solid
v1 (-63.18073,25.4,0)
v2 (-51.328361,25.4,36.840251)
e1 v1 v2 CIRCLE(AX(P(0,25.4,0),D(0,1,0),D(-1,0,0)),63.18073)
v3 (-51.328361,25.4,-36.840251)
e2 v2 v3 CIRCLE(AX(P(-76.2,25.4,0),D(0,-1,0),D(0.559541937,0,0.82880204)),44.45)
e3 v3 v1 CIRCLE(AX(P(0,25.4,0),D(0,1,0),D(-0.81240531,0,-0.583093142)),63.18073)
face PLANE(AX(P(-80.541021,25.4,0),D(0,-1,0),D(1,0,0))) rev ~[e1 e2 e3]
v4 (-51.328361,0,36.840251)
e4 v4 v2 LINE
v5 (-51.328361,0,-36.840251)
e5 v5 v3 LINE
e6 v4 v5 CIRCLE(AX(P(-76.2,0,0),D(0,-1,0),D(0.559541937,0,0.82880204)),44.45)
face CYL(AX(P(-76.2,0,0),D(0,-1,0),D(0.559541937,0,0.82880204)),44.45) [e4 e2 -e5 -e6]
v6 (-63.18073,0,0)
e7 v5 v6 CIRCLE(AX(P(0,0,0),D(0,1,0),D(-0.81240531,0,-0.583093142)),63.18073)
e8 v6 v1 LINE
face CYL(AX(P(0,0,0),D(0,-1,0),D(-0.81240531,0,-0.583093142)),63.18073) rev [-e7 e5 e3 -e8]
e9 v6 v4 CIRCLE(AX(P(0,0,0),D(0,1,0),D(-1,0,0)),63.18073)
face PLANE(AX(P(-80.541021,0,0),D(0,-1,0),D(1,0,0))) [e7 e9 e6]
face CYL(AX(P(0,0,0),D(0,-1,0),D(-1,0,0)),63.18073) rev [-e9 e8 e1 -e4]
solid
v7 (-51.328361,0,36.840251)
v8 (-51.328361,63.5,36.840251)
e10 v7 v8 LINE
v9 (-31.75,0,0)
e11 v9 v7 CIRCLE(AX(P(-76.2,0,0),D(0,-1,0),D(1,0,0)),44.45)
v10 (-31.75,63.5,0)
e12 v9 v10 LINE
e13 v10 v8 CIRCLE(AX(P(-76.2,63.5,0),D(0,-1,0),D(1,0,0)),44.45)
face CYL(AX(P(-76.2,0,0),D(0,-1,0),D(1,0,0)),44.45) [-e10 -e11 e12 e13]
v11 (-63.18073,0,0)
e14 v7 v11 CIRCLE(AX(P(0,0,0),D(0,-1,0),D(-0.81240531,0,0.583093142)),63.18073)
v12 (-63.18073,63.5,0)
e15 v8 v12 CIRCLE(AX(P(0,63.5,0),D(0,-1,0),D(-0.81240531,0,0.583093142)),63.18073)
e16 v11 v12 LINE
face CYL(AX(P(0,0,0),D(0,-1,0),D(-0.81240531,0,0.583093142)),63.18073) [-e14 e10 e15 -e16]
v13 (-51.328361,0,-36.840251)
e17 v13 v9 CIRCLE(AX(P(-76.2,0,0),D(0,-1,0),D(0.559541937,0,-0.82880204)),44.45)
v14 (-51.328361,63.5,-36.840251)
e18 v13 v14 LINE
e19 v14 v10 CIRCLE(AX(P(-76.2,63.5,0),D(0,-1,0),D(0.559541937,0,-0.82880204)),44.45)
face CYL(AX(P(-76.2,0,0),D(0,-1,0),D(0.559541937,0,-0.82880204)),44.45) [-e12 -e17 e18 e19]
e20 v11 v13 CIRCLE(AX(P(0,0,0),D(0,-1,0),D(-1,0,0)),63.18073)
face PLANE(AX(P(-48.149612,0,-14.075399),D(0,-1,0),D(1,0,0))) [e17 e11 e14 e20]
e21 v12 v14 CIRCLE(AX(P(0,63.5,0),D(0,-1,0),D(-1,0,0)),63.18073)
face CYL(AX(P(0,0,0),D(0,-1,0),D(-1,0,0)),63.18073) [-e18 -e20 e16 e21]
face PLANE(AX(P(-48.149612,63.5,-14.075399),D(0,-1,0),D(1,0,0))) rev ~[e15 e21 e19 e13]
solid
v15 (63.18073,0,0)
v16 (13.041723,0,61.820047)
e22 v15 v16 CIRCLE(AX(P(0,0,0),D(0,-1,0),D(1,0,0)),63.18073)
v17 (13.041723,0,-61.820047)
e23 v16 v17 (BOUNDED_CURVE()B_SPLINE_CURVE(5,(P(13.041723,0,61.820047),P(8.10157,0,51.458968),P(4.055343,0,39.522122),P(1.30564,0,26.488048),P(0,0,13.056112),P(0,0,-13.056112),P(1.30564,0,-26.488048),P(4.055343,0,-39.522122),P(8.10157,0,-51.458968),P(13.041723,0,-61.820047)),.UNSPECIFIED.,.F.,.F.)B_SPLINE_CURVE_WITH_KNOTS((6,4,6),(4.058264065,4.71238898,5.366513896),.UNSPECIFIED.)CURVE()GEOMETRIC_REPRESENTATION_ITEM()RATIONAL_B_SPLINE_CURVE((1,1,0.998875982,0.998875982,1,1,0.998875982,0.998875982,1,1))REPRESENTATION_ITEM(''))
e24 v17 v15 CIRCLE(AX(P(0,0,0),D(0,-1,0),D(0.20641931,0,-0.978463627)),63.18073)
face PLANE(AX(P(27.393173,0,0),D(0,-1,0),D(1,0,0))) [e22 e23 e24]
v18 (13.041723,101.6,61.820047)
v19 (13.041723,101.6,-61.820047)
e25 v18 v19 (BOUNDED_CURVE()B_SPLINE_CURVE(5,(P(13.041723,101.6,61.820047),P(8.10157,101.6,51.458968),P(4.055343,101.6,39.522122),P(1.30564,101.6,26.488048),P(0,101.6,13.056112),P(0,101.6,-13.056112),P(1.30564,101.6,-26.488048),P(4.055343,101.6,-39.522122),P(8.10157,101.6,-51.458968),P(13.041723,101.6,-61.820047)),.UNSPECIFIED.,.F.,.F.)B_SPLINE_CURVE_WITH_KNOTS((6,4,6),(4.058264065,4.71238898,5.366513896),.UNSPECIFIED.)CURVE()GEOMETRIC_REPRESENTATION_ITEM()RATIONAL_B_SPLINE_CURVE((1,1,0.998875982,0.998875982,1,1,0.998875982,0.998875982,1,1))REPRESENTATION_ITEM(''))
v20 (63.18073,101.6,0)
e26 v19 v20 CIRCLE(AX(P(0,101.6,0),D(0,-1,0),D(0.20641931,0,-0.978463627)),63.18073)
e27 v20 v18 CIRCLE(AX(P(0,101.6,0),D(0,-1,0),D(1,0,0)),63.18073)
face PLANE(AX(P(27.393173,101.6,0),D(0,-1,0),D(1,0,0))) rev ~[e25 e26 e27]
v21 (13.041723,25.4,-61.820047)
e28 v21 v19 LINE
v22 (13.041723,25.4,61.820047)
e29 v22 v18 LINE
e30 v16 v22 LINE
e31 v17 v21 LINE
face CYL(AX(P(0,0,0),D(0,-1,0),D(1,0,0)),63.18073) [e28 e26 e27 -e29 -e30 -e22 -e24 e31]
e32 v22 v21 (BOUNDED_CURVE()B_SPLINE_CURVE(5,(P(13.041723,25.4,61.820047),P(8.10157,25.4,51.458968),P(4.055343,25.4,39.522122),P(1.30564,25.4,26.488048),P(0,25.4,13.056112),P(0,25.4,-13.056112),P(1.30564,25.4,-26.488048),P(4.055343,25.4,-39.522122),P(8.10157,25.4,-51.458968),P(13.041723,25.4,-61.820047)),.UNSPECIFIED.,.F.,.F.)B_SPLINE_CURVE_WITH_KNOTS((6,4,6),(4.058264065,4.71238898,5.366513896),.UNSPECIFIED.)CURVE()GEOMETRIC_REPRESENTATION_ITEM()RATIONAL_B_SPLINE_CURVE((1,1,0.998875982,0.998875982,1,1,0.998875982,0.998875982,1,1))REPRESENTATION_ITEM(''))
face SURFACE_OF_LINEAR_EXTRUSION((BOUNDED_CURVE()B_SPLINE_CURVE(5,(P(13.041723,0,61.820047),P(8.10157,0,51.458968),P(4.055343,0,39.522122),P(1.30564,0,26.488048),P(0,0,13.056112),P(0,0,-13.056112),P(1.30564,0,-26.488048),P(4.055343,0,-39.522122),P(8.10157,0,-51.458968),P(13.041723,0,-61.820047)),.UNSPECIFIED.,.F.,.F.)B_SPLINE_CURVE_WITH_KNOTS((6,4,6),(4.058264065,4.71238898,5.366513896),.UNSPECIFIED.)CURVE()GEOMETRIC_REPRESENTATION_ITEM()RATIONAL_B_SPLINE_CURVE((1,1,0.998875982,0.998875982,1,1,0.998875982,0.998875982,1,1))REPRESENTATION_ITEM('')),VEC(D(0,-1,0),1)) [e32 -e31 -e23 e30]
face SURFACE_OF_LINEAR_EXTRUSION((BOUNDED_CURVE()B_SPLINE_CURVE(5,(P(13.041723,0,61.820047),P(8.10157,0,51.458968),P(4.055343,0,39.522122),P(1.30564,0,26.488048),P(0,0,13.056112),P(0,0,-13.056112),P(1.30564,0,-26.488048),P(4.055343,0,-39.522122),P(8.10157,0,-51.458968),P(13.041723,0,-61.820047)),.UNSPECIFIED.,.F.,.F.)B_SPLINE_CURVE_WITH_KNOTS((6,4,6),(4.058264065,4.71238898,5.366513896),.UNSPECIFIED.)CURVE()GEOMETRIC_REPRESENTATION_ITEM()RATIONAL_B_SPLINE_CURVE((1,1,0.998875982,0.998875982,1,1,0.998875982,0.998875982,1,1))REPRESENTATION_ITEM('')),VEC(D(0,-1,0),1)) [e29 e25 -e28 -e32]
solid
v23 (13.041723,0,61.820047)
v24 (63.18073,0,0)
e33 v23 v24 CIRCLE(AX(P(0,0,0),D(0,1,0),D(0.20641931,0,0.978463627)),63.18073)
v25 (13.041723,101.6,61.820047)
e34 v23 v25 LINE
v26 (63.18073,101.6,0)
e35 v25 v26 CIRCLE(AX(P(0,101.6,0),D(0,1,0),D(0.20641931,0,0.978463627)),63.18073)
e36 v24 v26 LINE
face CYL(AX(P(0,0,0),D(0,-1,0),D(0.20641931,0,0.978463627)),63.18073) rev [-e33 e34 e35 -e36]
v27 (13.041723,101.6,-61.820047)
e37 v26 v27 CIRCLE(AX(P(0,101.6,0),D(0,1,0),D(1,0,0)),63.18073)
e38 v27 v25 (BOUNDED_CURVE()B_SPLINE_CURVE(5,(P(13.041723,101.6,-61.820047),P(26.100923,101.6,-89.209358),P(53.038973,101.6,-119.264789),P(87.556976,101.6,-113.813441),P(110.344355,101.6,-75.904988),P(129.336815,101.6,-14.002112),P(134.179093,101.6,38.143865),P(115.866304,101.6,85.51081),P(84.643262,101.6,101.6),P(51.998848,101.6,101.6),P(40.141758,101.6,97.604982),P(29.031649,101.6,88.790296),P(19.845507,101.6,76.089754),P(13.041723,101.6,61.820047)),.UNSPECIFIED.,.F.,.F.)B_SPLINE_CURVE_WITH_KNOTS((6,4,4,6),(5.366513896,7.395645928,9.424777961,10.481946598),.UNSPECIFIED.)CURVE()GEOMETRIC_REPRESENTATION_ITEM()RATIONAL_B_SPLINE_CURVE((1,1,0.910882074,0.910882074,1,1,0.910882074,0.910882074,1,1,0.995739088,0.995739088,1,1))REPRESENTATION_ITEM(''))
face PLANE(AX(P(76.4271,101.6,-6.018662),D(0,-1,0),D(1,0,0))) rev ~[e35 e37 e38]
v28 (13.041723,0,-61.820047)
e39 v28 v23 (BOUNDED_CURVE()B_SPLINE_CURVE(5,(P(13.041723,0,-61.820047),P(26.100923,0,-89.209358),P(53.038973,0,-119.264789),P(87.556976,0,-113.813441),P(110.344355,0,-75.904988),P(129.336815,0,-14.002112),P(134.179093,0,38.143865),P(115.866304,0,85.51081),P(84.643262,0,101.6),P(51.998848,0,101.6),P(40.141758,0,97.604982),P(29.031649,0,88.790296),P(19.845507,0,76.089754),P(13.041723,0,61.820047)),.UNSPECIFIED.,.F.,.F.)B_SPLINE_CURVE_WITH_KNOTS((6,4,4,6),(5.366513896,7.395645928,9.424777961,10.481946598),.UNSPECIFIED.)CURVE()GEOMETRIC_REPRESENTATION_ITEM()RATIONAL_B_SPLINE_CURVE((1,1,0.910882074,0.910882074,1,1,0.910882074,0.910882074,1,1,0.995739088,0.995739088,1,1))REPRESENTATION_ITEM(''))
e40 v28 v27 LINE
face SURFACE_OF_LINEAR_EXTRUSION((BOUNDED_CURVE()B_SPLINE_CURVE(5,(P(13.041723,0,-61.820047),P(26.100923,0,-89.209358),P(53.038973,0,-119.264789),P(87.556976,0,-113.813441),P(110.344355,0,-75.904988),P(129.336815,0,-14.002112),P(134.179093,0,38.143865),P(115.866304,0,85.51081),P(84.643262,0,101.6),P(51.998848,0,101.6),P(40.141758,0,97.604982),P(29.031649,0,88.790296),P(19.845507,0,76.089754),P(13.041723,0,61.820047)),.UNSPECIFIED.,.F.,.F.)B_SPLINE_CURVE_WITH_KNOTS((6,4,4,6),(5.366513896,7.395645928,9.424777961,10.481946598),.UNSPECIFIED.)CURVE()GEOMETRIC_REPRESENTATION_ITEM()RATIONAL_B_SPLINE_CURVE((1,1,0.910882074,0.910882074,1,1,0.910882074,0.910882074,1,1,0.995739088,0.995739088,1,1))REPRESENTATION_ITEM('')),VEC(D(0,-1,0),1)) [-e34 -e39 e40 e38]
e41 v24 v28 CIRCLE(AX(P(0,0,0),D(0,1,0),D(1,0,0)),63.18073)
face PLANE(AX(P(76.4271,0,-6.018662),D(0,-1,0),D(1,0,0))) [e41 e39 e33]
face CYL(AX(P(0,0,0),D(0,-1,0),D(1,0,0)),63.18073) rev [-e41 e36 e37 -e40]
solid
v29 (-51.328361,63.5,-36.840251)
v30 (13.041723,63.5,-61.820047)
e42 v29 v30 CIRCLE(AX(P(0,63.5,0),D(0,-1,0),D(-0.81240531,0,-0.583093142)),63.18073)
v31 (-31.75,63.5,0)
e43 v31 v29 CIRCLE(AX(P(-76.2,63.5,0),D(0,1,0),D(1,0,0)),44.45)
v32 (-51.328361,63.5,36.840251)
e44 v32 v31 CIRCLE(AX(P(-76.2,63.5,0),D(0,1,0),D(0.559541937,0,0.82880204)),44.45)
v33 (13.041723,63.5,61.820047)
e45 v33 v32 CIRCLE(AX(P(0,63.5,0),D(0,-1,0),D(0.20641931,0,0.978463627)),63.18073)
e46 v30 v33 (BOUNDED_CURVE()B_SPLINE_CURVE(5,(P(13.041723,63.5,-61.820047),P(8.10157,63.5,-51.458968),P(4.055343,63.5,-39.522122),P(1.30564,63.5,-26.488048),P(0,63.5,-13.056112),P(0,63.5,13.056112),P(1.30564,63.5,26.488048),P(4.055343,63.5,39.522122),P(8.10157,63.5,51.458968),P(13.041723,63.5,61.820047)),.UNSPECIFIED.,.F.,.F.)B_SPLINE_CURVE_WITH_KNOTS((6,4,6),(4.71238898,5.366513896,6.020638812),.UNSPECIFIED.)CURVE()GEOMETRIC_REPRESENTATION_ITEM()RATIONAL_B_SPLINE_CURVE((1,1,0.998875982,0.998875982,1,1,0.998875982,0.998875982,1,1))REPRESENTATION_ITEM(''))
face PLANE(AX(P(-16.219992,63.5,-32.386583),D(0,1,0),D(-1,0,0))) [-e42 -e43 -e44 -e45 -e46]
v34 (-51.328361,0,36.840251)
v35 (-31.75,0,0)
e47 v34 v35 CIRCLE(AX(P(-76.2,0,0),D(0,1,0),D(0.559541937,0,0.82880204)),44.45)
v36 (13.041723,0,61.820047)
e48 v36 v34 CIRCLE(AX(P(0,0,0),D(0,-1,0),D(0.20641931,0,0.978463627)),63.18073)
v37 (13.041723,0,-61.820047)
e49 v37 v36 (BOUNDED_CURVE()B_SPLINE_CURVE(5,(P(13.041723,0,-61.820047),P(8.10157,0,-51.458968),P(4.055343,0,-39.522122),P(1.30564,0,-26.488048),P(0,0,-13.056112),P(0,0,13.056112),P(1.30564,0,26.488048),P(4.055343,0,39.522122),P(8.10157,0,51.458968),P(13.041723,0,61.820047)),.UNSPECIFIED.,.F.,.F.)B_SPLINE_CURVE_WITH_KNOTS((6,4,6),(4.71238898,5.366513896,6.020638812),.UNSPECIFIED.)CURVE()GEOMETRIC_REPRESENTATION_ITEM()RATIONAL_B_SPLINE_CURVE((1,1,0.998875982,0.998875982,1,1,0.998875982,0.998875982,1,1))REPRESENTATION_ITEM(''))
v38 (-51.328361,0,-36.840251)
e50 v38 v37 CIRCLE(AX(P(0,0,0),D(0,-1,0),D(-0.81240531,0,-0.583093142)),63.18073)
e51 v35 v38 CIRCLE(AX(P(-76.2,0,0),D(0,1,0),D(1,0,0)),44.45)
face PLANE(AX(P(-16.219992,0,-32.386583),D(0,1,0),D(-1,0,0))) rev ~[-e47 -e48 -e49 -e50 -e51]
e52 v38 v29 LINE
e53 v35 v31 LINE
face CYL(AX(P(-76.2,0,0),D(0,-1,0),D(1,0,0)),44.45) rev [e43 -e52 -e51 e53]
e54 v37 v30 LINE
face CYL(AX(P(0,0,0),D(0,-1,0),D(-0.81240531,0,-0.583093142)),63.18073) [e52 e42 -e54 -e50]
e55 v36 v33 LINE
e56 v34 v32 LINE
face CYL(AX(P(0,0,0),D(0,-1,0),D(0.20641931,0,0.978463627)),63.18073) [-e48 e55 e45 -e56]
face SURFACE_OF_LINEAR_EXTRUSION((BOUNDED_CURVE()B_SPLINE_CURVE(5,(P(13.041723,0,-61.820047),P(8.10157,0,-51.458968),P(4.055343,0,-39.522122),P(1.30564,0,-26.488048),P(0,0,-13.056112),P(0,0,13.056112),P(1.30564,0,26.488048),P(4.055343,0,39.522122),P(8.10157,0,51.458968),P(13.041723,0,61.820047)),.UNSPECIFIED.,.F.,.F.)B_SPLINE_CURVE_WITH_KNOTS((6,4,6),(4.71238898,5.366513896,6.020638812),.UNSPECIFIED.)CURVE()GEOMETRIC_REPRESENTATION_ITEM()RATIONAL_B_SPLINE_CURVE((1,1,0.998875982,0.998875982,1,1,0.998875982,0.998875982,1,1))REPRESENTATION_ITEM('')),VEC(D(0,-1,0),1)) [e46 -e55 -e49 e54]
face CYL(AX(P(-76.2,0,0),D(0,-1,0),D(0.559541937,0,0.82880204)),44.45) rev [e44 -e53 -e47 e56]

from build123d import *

# Parameters (mm, degrees)
F1_DEPTH = 63.5
F2_DEPTH = 101.6
F3_DEPTH = 25.4
F4_DEPTH = 63.5
F5_DEPTH = 101.6


# Not quite as in the source:
# - a feature names something its author has since deleted; it is built from what else it names


with BuildPart() as f1:
    # F0 (on Front) → F1 (new body)
    with BuildSketch(Plane.XZ):
        with BuildLine():
            add(Edge.make_bspline(
                [(0, 0), (0, -34.4673908513), (13.0417227804, -61.8200466708)],
                knots=[4.7123889804, 4.7123889804, 4.7123889804, 5.366513896, 5.366513896, 5.366513896], degree=2, weights=[1, 0.9469901505, 1]))
            Line((0, 0), (-31.75, 0))
            ThreePointArc((-31.75, 0), (-36.9485869215, -20.8597476336), (-51.3283609151, -36.8402506673))
            ThreePointArc((-51.3283609151, -36.8402506673), (-22.8574761732, -58.9011076844), (13.0417227804, -61.8200466708))
        make_face()
        with BuildLine():
            Line((-31.75, 0), (0, 0))
            add(Edge.make_bspline(
                [(13.0417227804, 61.8200466708), (0, 34.4673908513), (0, 0)],
                knots=[4.0582640648, 4.0582640648, 4.0582640648, 4.7123889804, 4.7123889804, 4.7123889804], degree=2, weights=[1, 0.9469901505, 1]))
            ThreePointArc((13.0417227804, 61.8200466708), (-22.8574761732, 58.9011076844), (-51.3283609151, 36.8402506673))
            ThreePointArc((-51.3283609151, 36.8402506673), (-36.9485869215, 20.8597476336), (-31.75, 0))
        make_face()
    extrude(amount=-F1_DEPTH)


with BuildPart() as f2:
    # F0 (on Front) → F2 (new body)
    with BuildSketch(Plane.XZ):
        with BuildLine():
            ThreePointArc((63.1807304759, 0), (49.0703081068, -39.7983613452), (13.0417227804, -61.8200466708))
            add(Edge.make_bspline(
                [(13.0417227804, -61.8200466708), (74.8763980172, -191.5070993665), (119.8405851231, -44.9535496832), (164.804772229, 101.6), (63.1807304759, 101.6)],
                knots=[5.366513896, 5.366513896, 5.366513896, 7.3956459284, 7.3956459284, 9.4247779608, 9.4247779608, 9.4247779608], degree=2, weights=[1, 0.5279885426, 1, 0.5279885426, 1]))
            Line((63.1807304759, 101.6), (63.1807304759, 0))
        make_face()
        with BuildLine():
            add(Edge.make_bspline(
                [(63.1807304759, 101.6), (32.00877033, 101.6), (13.0417227804, 61.8200466708)],
                knots=[3.1415926536, 3.1415926536, 3.1415926536, 4.0582640648, 4.0582640648, 4.0582640648], degree=2, weights=[1, 0.8967901166, 1]))
            ThreePointArc((13.0417227804, 61.8200466708), (49.0703081068, 39.7983613452), (63.1807304759, 0))
            Line((63.1807304759, 0), (63.1807304759, 101.6))
        make_face()
    extrude(amount=-F2_DEPTH)


with BuildPart() as f3:
    # F0 (on Front) → F3 (new body)
    with BuildSketch(Plane.XZ):
        with BuildLine():
            add(Edge.make_bspline(
                [(13.0417227804, 61.8200466708), (0, 34.4673908513), (0, 0)],
                knots=[4.0582640648, 4.0582640648, 4.0582640648, 4.7123889804, 4.7123889804, 4.7123889804], degree=2, weights=[1, 0.9469901505, 1]))
            add(Edge.make_bspline(
                [(0, 0), (0, -34.4673908513), (13.0417227804, -61.8200466708)],
                knots=[4.7123889804, 4.7123889804, 4.7123889804, 5.366513896, 5.366513896, 5.366513896], degree=2, weights=[1, 0.9469901505, 1]))
            ThreePointArc((13.0417227804, -61.8200466708), (49.0703081068, -39.7983613452), (63.1807304759, 0))
            ThreePointArc((63.1807304759, 0), (49.0703081068, 39.7983613452), (13.0417227804, 61.8200466708))
        make_face()
    extrude(amount=-F3_DEPTH)

    # F0 (on Front) → F5 (join)
    with BuildSketch(Plane.XZ):
        with BuildLine():
            add(Edge.make_bspline(
                [(13.0417227804, 61.8200466708), (0, 34.4673908513), (0, 0)],
                knots=[4.0582640648, 4.0582640648, 4.0582640648, 4.7123889804, 4.7123889804, 4.7123889804], degree=2, weights=[1, 0.9469901505, 1]))
            add(Edge.make_bspline(
                [(0, 0), (0, -34.4673908513), (13.0417227804, -61.8200466708)],
                knots=[4.7123889804, 4.7123889804, 4.7123889804, 5.366513896, 5.366513896, 5.366513896], degree=2, weights=[1, 0.9469901505, 1]))
            ThreePointArc((13.0417227804, -61.8200466708), (49.0703081068, -39.7983613452), (63.1807304759, 0))
            ThreePointArc((63.1807304759, 0), (49.0703081068, 39.7983613452), (13.0417227804, 61.8200466708))
        make_face()
    extrude(amount=-F5_DEPTH)


with BuildPart() as f3b:
    # F0 (on Front) → F3, piece 2 (new body)
    with BuildSketch(Plane.XZ):
        with BuildLine():
            ThreePointArc((-51.3283609151, -36.8402506673), (-60.1446923685, -19.3499530583), (-63.1807304759, 0))
            ThreePointArc((-63.1807304759, 0), (-60.1446923685, 19.3499530583), (-51.3283609151, 36.8402506673))
            ThreePointArc((-51.3283609151, 36.8402506673), (-120.65, 0), (-51.3283609151, -36.8402506673))
        make_face()
    extrude(amount=-F3_DEPTH)


with BuildPart() as f4:
    # F0 (on Front) → F4 (new body)
    with BuildSketch(Plane.XZ):
        with BuildLine():
            ThreePointArc((-51.3283609151, -36.8402506673), (-36.9485869215, -20.8597476336), (-31.75, 0))
            Line((-31.75, 0), (-63.1807304759, 0))
            ThreePointArc((-63.1807304759, 0), (-60.1446923685, -19.3499530583), (-51.3283609151, -36.8402506673))
        make_face()
        with BuildLine():
            Line((-63.1807304759, 0), (-31.75, 0))
            ThreePointArc((-31.75, 0), (-36.9485869215, 20.8597476336), (-51.3283609151, 36.8402506673))
            ThreePointArc((-51.3283609151, 36.8402506673), (-60.1446923685, 19.3499530583), (-63.1807304759, 0))
        make_face()
    extrude(amount=-F4_DEPTH)


solid = Compound([f1.part, f2.part, f3.part, f3b.part, f4.part])
